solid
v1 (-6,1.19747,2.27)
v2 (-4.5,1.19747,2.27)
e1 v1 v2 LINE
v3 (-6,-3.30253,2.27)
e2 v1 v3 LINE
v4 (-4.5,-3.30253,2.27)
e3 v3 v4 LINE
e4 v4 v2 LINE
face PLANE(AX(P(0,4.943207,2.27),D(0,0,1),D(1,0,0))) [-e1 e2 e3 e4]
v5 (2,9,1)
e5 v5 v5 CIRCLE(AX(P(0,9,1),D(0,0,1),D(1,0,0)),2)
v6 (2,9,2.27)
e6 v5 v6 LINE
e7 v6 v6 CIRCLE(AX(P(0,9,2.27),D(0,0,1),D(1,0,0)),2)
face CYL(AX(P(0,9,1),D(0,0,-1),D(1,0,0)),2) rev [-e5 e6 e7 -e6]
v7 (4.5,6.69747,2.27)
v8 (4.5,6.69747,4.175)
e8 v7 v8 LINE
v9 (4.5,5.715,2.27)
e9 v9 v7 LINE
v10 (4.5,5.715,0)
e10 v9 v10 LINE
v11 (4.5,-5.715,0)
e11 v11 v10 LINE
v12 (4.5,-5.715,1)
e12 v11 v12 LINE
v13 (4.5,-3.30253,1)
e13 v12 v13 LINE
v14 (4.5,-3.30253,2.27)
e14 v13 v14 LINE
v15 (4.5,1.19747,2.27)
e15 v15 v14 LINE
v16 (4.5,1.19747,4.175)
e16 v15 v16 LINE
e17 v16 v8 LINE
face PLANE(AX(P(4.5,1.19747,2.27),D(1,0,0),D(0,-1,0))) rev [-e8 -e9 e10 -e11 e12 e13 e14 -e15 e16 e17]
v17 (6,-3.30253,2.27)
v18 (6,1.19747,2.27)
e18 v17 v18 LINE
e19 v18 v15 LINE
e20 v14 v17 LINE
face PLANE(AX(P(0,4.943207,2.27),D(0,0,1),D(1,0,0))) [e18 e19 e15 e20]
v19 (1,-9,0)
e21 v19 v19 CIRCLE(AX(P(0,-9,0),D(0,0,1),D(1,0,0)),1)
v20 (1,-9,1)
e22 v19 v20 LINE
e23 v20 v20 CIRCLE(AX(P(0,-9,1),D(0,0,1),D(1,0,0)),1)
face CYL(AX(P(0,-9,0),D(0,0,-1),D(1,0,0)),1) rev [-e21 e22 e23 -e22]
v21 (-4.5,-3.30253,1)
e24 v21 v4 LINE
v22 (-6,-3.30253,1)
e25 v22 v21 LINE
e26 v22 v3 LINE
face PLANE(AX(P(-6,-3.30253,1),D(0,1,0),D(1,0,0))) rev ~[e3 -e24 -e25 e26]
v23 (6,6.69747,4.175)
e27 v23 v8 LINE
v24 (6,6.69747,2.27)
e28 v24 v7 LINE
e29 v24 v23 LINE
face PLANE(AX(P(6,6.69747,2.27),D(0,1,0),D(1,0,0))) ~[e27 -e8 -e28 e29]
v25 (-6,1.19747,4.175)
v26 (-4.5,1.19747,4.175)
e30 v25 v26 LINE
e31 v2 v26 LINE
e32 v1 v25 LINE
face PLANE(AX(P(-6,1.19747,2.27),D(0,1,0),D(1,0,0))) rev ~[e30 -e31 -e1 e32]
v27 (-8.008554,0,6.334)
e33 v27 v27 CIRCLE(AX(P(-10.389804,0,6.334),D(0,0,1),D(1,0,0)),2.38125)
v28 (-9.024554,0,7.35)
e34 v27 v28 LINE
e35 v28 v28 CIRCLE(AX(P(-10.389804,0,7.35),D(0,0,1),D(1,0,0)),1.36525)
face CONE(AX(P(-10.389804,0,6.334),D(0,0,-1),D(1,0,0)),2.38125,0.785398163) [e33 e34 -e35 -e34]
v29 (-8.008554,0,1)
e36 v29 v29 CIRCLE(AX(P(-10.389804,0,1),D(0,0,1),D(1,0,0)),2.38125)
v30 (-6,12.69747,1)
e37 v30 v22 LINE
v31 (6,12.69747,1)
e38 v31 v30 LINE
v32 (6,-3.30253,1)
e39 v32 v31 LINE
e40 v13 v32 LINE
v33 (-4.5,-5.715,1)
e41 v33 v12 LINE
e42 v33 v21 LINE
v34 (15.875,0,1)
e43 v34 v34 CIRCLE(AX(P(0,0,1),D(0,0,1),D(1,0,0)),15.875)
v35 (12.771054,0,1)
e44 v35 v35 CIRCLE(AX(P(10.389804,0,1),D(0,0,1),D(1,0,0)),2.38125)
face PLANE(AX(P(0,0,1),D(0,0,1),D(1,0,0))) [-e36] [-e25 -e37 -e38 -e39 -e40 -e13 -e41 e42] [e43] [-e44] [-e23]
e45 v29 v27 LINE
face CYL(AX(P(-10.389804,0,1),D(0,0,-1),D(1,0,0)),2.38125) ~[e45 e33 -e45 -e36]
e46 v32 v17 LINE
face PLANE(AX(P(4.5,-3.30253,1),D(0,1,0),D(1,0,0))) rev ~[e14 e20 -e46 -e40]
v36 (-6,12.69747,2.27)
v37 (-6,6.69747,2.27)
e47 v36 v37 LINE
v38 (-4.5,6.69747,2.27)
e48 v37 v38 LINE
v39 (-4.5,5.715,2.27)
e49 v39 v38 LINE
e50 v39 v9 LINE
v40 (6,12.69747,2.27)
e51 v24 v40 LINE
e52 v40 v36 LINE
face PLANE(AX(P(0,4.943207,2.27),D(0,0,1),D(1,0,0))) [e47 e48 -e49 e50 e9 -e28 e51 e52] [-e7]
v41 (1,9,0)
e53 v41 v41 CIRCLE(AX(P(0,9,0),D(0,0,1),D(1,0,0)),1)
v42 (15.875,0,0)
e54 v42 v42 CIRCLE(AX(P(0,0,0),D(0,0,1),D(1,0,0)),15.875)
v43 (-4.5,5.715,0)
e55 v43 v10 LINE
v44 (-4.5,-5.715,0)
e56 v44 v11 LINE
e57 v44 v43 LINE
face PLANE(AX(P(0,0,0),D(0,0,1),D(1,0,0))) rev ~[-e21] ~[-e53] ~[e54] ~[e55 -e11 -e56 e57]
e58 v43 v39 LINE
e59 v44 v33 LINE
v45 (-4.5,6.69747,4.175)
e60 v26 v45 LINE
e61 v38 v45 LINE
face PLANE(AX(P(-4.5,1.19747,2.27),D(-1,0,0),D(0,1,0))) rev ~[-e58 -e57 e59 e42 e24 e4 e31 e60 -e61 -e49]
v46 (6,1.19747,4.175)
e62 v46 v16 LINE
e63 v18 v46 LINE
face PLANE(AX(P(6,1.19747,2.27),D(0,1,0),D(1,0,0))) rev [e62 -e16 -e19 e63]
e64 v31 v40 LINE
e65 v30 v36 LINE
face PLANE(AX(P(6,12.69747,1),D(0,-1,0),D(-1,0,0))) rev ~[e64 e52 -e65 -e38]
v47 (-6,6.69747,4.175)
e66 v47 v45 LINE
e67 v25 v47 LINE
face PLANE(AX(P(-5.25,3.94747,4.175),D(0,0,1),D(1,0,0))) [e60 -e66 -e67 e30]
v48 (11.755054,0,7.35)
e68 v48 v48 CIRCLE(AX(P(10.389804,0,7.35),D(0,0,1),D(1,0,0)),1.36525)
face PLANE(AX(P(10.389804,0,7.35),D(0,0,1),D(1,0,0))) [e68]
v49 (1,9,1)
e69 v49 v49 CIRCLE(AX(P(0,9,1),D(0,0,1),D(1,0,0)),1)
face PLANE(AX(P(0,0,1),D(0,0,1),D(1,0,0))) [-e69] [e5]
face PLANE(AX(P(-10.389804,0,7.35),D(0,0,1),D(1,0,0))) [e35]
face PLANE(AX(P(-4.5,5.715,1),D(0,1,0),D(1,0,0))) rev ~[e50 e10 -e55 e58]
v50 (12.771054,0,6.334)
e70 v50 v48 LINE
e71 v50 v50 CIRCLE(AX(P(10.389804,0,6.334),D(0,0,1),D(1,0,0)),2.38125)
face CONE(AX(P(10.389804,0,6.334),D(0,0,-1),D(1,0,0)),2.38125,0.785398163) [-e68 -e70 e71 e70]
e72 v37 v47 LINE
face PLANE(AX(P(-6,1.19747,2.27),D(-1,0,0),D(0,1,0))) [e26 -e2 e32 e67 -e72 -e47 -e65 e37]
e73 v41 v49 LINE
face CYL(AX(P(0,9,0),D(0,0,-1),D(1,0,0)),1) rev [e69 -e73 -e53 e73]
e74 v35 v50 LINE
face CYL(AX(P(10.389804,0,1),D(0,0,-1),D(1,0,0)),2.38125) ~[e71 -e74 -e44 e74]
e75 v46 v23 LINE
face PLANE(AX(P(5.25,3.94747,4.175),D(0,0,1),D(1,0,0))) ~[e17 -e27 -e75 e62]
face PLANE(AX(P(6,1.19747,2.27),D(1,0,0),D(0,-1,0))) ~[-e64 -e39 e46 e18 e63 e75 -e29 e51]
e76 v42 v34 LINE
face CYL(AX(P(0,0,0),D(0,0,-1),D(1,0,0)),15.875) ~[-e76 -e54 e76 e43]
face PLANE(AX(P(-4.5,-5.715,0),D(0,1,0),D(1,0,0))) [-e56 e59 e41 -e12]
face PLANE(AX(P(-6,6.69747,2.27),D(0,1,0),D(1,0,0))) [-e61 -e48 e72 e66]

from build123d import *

# Parameters (mm, degrees)
F0_R     = 15.875
F0_R_2   = 1
F0_W     = 9
F0_H     = 11.43
F1_DEPTH = 1
F2_R     = 2
F3_DEPTH = 1.27
F4_W     = 1.5
F4_H     = 5.5
F5_DEPTH = 1.905
F6_R     = 2.38125
F7_DEPTH = 6.35
F8_SIZE  = 1.016


# Not quite as in the source:
# - a pattern or mirror of a feature is missing from the dataset's text; its kind, count and spacing are read off the source's solid


with BuildPart() as f1:
    # F0 (on Top) → F1 (new body)
    with BuildSketch(Plane.XY):
        Circle(F0_R)
        with Locations((0, -9)):
            Circle(F0_R_2, mode=Mode.SUBTRACT)
        Rectangle(F0_W, F0_H, mode=Mode.SUBTRACT)
        with Locations((0, 9)):
            Circle(F0_R_2, mode=Mode.SUBTRACT)
    extrude(amount=F1_DEPTH)

    # F2 (on face) → F3 (join)
    with BuildSketch(Plane.XY.offset(1)):
        Polygon((6, 12.6974700204), (-6, 12.6974700204), (-6, -3.3025299796), (-4.5, -3.3025299796), (-4.5, 5.715), (4.5, 5.715), (4.5, -3.3025299796), (6, -3.3025299796), align=None)
        with Locations((0, 9)):
            Circle(F2_R, mode=Mode.SUBTRACT)
    extrude(amount=F3_DEPTH)

    # F4 (on face) → F5 (join)
    with BuildSketch(Plane.XY.offset(2.27)):
        with Locations((-5.25, 3.9474700204)):
            Rectangle(F4_W, F4_H)
    f5 = extrude(amount=F5_DEPTH)

    # F5_copies: F5 across plane
    add(f5.mirror(Plane(origin=(0, 0, 0), x_dir=(0, 0, 1), z_dir=(1, 0, 0))))

    # F6 (on face) → F7 (join)
    with BuildSketch(Plane.XY.offset(1)):
        with Locations((10.3898039088, 0)):
            Circle(F6_R)
        with Locations((-10.3898039088, 0)):
            Circle(F6_R)
    extrude(amount=F7_DEPTH)

    # F8
    f8_edges = [f1.edges().sort_by_distance(p)[0] for p in [
        (-12.771054, 0, 7.35),
        (8.008554, 0, 7.35),
    ]]
    chamfer(f8_edges, length=F8_SIZE)


solid = f1.part
